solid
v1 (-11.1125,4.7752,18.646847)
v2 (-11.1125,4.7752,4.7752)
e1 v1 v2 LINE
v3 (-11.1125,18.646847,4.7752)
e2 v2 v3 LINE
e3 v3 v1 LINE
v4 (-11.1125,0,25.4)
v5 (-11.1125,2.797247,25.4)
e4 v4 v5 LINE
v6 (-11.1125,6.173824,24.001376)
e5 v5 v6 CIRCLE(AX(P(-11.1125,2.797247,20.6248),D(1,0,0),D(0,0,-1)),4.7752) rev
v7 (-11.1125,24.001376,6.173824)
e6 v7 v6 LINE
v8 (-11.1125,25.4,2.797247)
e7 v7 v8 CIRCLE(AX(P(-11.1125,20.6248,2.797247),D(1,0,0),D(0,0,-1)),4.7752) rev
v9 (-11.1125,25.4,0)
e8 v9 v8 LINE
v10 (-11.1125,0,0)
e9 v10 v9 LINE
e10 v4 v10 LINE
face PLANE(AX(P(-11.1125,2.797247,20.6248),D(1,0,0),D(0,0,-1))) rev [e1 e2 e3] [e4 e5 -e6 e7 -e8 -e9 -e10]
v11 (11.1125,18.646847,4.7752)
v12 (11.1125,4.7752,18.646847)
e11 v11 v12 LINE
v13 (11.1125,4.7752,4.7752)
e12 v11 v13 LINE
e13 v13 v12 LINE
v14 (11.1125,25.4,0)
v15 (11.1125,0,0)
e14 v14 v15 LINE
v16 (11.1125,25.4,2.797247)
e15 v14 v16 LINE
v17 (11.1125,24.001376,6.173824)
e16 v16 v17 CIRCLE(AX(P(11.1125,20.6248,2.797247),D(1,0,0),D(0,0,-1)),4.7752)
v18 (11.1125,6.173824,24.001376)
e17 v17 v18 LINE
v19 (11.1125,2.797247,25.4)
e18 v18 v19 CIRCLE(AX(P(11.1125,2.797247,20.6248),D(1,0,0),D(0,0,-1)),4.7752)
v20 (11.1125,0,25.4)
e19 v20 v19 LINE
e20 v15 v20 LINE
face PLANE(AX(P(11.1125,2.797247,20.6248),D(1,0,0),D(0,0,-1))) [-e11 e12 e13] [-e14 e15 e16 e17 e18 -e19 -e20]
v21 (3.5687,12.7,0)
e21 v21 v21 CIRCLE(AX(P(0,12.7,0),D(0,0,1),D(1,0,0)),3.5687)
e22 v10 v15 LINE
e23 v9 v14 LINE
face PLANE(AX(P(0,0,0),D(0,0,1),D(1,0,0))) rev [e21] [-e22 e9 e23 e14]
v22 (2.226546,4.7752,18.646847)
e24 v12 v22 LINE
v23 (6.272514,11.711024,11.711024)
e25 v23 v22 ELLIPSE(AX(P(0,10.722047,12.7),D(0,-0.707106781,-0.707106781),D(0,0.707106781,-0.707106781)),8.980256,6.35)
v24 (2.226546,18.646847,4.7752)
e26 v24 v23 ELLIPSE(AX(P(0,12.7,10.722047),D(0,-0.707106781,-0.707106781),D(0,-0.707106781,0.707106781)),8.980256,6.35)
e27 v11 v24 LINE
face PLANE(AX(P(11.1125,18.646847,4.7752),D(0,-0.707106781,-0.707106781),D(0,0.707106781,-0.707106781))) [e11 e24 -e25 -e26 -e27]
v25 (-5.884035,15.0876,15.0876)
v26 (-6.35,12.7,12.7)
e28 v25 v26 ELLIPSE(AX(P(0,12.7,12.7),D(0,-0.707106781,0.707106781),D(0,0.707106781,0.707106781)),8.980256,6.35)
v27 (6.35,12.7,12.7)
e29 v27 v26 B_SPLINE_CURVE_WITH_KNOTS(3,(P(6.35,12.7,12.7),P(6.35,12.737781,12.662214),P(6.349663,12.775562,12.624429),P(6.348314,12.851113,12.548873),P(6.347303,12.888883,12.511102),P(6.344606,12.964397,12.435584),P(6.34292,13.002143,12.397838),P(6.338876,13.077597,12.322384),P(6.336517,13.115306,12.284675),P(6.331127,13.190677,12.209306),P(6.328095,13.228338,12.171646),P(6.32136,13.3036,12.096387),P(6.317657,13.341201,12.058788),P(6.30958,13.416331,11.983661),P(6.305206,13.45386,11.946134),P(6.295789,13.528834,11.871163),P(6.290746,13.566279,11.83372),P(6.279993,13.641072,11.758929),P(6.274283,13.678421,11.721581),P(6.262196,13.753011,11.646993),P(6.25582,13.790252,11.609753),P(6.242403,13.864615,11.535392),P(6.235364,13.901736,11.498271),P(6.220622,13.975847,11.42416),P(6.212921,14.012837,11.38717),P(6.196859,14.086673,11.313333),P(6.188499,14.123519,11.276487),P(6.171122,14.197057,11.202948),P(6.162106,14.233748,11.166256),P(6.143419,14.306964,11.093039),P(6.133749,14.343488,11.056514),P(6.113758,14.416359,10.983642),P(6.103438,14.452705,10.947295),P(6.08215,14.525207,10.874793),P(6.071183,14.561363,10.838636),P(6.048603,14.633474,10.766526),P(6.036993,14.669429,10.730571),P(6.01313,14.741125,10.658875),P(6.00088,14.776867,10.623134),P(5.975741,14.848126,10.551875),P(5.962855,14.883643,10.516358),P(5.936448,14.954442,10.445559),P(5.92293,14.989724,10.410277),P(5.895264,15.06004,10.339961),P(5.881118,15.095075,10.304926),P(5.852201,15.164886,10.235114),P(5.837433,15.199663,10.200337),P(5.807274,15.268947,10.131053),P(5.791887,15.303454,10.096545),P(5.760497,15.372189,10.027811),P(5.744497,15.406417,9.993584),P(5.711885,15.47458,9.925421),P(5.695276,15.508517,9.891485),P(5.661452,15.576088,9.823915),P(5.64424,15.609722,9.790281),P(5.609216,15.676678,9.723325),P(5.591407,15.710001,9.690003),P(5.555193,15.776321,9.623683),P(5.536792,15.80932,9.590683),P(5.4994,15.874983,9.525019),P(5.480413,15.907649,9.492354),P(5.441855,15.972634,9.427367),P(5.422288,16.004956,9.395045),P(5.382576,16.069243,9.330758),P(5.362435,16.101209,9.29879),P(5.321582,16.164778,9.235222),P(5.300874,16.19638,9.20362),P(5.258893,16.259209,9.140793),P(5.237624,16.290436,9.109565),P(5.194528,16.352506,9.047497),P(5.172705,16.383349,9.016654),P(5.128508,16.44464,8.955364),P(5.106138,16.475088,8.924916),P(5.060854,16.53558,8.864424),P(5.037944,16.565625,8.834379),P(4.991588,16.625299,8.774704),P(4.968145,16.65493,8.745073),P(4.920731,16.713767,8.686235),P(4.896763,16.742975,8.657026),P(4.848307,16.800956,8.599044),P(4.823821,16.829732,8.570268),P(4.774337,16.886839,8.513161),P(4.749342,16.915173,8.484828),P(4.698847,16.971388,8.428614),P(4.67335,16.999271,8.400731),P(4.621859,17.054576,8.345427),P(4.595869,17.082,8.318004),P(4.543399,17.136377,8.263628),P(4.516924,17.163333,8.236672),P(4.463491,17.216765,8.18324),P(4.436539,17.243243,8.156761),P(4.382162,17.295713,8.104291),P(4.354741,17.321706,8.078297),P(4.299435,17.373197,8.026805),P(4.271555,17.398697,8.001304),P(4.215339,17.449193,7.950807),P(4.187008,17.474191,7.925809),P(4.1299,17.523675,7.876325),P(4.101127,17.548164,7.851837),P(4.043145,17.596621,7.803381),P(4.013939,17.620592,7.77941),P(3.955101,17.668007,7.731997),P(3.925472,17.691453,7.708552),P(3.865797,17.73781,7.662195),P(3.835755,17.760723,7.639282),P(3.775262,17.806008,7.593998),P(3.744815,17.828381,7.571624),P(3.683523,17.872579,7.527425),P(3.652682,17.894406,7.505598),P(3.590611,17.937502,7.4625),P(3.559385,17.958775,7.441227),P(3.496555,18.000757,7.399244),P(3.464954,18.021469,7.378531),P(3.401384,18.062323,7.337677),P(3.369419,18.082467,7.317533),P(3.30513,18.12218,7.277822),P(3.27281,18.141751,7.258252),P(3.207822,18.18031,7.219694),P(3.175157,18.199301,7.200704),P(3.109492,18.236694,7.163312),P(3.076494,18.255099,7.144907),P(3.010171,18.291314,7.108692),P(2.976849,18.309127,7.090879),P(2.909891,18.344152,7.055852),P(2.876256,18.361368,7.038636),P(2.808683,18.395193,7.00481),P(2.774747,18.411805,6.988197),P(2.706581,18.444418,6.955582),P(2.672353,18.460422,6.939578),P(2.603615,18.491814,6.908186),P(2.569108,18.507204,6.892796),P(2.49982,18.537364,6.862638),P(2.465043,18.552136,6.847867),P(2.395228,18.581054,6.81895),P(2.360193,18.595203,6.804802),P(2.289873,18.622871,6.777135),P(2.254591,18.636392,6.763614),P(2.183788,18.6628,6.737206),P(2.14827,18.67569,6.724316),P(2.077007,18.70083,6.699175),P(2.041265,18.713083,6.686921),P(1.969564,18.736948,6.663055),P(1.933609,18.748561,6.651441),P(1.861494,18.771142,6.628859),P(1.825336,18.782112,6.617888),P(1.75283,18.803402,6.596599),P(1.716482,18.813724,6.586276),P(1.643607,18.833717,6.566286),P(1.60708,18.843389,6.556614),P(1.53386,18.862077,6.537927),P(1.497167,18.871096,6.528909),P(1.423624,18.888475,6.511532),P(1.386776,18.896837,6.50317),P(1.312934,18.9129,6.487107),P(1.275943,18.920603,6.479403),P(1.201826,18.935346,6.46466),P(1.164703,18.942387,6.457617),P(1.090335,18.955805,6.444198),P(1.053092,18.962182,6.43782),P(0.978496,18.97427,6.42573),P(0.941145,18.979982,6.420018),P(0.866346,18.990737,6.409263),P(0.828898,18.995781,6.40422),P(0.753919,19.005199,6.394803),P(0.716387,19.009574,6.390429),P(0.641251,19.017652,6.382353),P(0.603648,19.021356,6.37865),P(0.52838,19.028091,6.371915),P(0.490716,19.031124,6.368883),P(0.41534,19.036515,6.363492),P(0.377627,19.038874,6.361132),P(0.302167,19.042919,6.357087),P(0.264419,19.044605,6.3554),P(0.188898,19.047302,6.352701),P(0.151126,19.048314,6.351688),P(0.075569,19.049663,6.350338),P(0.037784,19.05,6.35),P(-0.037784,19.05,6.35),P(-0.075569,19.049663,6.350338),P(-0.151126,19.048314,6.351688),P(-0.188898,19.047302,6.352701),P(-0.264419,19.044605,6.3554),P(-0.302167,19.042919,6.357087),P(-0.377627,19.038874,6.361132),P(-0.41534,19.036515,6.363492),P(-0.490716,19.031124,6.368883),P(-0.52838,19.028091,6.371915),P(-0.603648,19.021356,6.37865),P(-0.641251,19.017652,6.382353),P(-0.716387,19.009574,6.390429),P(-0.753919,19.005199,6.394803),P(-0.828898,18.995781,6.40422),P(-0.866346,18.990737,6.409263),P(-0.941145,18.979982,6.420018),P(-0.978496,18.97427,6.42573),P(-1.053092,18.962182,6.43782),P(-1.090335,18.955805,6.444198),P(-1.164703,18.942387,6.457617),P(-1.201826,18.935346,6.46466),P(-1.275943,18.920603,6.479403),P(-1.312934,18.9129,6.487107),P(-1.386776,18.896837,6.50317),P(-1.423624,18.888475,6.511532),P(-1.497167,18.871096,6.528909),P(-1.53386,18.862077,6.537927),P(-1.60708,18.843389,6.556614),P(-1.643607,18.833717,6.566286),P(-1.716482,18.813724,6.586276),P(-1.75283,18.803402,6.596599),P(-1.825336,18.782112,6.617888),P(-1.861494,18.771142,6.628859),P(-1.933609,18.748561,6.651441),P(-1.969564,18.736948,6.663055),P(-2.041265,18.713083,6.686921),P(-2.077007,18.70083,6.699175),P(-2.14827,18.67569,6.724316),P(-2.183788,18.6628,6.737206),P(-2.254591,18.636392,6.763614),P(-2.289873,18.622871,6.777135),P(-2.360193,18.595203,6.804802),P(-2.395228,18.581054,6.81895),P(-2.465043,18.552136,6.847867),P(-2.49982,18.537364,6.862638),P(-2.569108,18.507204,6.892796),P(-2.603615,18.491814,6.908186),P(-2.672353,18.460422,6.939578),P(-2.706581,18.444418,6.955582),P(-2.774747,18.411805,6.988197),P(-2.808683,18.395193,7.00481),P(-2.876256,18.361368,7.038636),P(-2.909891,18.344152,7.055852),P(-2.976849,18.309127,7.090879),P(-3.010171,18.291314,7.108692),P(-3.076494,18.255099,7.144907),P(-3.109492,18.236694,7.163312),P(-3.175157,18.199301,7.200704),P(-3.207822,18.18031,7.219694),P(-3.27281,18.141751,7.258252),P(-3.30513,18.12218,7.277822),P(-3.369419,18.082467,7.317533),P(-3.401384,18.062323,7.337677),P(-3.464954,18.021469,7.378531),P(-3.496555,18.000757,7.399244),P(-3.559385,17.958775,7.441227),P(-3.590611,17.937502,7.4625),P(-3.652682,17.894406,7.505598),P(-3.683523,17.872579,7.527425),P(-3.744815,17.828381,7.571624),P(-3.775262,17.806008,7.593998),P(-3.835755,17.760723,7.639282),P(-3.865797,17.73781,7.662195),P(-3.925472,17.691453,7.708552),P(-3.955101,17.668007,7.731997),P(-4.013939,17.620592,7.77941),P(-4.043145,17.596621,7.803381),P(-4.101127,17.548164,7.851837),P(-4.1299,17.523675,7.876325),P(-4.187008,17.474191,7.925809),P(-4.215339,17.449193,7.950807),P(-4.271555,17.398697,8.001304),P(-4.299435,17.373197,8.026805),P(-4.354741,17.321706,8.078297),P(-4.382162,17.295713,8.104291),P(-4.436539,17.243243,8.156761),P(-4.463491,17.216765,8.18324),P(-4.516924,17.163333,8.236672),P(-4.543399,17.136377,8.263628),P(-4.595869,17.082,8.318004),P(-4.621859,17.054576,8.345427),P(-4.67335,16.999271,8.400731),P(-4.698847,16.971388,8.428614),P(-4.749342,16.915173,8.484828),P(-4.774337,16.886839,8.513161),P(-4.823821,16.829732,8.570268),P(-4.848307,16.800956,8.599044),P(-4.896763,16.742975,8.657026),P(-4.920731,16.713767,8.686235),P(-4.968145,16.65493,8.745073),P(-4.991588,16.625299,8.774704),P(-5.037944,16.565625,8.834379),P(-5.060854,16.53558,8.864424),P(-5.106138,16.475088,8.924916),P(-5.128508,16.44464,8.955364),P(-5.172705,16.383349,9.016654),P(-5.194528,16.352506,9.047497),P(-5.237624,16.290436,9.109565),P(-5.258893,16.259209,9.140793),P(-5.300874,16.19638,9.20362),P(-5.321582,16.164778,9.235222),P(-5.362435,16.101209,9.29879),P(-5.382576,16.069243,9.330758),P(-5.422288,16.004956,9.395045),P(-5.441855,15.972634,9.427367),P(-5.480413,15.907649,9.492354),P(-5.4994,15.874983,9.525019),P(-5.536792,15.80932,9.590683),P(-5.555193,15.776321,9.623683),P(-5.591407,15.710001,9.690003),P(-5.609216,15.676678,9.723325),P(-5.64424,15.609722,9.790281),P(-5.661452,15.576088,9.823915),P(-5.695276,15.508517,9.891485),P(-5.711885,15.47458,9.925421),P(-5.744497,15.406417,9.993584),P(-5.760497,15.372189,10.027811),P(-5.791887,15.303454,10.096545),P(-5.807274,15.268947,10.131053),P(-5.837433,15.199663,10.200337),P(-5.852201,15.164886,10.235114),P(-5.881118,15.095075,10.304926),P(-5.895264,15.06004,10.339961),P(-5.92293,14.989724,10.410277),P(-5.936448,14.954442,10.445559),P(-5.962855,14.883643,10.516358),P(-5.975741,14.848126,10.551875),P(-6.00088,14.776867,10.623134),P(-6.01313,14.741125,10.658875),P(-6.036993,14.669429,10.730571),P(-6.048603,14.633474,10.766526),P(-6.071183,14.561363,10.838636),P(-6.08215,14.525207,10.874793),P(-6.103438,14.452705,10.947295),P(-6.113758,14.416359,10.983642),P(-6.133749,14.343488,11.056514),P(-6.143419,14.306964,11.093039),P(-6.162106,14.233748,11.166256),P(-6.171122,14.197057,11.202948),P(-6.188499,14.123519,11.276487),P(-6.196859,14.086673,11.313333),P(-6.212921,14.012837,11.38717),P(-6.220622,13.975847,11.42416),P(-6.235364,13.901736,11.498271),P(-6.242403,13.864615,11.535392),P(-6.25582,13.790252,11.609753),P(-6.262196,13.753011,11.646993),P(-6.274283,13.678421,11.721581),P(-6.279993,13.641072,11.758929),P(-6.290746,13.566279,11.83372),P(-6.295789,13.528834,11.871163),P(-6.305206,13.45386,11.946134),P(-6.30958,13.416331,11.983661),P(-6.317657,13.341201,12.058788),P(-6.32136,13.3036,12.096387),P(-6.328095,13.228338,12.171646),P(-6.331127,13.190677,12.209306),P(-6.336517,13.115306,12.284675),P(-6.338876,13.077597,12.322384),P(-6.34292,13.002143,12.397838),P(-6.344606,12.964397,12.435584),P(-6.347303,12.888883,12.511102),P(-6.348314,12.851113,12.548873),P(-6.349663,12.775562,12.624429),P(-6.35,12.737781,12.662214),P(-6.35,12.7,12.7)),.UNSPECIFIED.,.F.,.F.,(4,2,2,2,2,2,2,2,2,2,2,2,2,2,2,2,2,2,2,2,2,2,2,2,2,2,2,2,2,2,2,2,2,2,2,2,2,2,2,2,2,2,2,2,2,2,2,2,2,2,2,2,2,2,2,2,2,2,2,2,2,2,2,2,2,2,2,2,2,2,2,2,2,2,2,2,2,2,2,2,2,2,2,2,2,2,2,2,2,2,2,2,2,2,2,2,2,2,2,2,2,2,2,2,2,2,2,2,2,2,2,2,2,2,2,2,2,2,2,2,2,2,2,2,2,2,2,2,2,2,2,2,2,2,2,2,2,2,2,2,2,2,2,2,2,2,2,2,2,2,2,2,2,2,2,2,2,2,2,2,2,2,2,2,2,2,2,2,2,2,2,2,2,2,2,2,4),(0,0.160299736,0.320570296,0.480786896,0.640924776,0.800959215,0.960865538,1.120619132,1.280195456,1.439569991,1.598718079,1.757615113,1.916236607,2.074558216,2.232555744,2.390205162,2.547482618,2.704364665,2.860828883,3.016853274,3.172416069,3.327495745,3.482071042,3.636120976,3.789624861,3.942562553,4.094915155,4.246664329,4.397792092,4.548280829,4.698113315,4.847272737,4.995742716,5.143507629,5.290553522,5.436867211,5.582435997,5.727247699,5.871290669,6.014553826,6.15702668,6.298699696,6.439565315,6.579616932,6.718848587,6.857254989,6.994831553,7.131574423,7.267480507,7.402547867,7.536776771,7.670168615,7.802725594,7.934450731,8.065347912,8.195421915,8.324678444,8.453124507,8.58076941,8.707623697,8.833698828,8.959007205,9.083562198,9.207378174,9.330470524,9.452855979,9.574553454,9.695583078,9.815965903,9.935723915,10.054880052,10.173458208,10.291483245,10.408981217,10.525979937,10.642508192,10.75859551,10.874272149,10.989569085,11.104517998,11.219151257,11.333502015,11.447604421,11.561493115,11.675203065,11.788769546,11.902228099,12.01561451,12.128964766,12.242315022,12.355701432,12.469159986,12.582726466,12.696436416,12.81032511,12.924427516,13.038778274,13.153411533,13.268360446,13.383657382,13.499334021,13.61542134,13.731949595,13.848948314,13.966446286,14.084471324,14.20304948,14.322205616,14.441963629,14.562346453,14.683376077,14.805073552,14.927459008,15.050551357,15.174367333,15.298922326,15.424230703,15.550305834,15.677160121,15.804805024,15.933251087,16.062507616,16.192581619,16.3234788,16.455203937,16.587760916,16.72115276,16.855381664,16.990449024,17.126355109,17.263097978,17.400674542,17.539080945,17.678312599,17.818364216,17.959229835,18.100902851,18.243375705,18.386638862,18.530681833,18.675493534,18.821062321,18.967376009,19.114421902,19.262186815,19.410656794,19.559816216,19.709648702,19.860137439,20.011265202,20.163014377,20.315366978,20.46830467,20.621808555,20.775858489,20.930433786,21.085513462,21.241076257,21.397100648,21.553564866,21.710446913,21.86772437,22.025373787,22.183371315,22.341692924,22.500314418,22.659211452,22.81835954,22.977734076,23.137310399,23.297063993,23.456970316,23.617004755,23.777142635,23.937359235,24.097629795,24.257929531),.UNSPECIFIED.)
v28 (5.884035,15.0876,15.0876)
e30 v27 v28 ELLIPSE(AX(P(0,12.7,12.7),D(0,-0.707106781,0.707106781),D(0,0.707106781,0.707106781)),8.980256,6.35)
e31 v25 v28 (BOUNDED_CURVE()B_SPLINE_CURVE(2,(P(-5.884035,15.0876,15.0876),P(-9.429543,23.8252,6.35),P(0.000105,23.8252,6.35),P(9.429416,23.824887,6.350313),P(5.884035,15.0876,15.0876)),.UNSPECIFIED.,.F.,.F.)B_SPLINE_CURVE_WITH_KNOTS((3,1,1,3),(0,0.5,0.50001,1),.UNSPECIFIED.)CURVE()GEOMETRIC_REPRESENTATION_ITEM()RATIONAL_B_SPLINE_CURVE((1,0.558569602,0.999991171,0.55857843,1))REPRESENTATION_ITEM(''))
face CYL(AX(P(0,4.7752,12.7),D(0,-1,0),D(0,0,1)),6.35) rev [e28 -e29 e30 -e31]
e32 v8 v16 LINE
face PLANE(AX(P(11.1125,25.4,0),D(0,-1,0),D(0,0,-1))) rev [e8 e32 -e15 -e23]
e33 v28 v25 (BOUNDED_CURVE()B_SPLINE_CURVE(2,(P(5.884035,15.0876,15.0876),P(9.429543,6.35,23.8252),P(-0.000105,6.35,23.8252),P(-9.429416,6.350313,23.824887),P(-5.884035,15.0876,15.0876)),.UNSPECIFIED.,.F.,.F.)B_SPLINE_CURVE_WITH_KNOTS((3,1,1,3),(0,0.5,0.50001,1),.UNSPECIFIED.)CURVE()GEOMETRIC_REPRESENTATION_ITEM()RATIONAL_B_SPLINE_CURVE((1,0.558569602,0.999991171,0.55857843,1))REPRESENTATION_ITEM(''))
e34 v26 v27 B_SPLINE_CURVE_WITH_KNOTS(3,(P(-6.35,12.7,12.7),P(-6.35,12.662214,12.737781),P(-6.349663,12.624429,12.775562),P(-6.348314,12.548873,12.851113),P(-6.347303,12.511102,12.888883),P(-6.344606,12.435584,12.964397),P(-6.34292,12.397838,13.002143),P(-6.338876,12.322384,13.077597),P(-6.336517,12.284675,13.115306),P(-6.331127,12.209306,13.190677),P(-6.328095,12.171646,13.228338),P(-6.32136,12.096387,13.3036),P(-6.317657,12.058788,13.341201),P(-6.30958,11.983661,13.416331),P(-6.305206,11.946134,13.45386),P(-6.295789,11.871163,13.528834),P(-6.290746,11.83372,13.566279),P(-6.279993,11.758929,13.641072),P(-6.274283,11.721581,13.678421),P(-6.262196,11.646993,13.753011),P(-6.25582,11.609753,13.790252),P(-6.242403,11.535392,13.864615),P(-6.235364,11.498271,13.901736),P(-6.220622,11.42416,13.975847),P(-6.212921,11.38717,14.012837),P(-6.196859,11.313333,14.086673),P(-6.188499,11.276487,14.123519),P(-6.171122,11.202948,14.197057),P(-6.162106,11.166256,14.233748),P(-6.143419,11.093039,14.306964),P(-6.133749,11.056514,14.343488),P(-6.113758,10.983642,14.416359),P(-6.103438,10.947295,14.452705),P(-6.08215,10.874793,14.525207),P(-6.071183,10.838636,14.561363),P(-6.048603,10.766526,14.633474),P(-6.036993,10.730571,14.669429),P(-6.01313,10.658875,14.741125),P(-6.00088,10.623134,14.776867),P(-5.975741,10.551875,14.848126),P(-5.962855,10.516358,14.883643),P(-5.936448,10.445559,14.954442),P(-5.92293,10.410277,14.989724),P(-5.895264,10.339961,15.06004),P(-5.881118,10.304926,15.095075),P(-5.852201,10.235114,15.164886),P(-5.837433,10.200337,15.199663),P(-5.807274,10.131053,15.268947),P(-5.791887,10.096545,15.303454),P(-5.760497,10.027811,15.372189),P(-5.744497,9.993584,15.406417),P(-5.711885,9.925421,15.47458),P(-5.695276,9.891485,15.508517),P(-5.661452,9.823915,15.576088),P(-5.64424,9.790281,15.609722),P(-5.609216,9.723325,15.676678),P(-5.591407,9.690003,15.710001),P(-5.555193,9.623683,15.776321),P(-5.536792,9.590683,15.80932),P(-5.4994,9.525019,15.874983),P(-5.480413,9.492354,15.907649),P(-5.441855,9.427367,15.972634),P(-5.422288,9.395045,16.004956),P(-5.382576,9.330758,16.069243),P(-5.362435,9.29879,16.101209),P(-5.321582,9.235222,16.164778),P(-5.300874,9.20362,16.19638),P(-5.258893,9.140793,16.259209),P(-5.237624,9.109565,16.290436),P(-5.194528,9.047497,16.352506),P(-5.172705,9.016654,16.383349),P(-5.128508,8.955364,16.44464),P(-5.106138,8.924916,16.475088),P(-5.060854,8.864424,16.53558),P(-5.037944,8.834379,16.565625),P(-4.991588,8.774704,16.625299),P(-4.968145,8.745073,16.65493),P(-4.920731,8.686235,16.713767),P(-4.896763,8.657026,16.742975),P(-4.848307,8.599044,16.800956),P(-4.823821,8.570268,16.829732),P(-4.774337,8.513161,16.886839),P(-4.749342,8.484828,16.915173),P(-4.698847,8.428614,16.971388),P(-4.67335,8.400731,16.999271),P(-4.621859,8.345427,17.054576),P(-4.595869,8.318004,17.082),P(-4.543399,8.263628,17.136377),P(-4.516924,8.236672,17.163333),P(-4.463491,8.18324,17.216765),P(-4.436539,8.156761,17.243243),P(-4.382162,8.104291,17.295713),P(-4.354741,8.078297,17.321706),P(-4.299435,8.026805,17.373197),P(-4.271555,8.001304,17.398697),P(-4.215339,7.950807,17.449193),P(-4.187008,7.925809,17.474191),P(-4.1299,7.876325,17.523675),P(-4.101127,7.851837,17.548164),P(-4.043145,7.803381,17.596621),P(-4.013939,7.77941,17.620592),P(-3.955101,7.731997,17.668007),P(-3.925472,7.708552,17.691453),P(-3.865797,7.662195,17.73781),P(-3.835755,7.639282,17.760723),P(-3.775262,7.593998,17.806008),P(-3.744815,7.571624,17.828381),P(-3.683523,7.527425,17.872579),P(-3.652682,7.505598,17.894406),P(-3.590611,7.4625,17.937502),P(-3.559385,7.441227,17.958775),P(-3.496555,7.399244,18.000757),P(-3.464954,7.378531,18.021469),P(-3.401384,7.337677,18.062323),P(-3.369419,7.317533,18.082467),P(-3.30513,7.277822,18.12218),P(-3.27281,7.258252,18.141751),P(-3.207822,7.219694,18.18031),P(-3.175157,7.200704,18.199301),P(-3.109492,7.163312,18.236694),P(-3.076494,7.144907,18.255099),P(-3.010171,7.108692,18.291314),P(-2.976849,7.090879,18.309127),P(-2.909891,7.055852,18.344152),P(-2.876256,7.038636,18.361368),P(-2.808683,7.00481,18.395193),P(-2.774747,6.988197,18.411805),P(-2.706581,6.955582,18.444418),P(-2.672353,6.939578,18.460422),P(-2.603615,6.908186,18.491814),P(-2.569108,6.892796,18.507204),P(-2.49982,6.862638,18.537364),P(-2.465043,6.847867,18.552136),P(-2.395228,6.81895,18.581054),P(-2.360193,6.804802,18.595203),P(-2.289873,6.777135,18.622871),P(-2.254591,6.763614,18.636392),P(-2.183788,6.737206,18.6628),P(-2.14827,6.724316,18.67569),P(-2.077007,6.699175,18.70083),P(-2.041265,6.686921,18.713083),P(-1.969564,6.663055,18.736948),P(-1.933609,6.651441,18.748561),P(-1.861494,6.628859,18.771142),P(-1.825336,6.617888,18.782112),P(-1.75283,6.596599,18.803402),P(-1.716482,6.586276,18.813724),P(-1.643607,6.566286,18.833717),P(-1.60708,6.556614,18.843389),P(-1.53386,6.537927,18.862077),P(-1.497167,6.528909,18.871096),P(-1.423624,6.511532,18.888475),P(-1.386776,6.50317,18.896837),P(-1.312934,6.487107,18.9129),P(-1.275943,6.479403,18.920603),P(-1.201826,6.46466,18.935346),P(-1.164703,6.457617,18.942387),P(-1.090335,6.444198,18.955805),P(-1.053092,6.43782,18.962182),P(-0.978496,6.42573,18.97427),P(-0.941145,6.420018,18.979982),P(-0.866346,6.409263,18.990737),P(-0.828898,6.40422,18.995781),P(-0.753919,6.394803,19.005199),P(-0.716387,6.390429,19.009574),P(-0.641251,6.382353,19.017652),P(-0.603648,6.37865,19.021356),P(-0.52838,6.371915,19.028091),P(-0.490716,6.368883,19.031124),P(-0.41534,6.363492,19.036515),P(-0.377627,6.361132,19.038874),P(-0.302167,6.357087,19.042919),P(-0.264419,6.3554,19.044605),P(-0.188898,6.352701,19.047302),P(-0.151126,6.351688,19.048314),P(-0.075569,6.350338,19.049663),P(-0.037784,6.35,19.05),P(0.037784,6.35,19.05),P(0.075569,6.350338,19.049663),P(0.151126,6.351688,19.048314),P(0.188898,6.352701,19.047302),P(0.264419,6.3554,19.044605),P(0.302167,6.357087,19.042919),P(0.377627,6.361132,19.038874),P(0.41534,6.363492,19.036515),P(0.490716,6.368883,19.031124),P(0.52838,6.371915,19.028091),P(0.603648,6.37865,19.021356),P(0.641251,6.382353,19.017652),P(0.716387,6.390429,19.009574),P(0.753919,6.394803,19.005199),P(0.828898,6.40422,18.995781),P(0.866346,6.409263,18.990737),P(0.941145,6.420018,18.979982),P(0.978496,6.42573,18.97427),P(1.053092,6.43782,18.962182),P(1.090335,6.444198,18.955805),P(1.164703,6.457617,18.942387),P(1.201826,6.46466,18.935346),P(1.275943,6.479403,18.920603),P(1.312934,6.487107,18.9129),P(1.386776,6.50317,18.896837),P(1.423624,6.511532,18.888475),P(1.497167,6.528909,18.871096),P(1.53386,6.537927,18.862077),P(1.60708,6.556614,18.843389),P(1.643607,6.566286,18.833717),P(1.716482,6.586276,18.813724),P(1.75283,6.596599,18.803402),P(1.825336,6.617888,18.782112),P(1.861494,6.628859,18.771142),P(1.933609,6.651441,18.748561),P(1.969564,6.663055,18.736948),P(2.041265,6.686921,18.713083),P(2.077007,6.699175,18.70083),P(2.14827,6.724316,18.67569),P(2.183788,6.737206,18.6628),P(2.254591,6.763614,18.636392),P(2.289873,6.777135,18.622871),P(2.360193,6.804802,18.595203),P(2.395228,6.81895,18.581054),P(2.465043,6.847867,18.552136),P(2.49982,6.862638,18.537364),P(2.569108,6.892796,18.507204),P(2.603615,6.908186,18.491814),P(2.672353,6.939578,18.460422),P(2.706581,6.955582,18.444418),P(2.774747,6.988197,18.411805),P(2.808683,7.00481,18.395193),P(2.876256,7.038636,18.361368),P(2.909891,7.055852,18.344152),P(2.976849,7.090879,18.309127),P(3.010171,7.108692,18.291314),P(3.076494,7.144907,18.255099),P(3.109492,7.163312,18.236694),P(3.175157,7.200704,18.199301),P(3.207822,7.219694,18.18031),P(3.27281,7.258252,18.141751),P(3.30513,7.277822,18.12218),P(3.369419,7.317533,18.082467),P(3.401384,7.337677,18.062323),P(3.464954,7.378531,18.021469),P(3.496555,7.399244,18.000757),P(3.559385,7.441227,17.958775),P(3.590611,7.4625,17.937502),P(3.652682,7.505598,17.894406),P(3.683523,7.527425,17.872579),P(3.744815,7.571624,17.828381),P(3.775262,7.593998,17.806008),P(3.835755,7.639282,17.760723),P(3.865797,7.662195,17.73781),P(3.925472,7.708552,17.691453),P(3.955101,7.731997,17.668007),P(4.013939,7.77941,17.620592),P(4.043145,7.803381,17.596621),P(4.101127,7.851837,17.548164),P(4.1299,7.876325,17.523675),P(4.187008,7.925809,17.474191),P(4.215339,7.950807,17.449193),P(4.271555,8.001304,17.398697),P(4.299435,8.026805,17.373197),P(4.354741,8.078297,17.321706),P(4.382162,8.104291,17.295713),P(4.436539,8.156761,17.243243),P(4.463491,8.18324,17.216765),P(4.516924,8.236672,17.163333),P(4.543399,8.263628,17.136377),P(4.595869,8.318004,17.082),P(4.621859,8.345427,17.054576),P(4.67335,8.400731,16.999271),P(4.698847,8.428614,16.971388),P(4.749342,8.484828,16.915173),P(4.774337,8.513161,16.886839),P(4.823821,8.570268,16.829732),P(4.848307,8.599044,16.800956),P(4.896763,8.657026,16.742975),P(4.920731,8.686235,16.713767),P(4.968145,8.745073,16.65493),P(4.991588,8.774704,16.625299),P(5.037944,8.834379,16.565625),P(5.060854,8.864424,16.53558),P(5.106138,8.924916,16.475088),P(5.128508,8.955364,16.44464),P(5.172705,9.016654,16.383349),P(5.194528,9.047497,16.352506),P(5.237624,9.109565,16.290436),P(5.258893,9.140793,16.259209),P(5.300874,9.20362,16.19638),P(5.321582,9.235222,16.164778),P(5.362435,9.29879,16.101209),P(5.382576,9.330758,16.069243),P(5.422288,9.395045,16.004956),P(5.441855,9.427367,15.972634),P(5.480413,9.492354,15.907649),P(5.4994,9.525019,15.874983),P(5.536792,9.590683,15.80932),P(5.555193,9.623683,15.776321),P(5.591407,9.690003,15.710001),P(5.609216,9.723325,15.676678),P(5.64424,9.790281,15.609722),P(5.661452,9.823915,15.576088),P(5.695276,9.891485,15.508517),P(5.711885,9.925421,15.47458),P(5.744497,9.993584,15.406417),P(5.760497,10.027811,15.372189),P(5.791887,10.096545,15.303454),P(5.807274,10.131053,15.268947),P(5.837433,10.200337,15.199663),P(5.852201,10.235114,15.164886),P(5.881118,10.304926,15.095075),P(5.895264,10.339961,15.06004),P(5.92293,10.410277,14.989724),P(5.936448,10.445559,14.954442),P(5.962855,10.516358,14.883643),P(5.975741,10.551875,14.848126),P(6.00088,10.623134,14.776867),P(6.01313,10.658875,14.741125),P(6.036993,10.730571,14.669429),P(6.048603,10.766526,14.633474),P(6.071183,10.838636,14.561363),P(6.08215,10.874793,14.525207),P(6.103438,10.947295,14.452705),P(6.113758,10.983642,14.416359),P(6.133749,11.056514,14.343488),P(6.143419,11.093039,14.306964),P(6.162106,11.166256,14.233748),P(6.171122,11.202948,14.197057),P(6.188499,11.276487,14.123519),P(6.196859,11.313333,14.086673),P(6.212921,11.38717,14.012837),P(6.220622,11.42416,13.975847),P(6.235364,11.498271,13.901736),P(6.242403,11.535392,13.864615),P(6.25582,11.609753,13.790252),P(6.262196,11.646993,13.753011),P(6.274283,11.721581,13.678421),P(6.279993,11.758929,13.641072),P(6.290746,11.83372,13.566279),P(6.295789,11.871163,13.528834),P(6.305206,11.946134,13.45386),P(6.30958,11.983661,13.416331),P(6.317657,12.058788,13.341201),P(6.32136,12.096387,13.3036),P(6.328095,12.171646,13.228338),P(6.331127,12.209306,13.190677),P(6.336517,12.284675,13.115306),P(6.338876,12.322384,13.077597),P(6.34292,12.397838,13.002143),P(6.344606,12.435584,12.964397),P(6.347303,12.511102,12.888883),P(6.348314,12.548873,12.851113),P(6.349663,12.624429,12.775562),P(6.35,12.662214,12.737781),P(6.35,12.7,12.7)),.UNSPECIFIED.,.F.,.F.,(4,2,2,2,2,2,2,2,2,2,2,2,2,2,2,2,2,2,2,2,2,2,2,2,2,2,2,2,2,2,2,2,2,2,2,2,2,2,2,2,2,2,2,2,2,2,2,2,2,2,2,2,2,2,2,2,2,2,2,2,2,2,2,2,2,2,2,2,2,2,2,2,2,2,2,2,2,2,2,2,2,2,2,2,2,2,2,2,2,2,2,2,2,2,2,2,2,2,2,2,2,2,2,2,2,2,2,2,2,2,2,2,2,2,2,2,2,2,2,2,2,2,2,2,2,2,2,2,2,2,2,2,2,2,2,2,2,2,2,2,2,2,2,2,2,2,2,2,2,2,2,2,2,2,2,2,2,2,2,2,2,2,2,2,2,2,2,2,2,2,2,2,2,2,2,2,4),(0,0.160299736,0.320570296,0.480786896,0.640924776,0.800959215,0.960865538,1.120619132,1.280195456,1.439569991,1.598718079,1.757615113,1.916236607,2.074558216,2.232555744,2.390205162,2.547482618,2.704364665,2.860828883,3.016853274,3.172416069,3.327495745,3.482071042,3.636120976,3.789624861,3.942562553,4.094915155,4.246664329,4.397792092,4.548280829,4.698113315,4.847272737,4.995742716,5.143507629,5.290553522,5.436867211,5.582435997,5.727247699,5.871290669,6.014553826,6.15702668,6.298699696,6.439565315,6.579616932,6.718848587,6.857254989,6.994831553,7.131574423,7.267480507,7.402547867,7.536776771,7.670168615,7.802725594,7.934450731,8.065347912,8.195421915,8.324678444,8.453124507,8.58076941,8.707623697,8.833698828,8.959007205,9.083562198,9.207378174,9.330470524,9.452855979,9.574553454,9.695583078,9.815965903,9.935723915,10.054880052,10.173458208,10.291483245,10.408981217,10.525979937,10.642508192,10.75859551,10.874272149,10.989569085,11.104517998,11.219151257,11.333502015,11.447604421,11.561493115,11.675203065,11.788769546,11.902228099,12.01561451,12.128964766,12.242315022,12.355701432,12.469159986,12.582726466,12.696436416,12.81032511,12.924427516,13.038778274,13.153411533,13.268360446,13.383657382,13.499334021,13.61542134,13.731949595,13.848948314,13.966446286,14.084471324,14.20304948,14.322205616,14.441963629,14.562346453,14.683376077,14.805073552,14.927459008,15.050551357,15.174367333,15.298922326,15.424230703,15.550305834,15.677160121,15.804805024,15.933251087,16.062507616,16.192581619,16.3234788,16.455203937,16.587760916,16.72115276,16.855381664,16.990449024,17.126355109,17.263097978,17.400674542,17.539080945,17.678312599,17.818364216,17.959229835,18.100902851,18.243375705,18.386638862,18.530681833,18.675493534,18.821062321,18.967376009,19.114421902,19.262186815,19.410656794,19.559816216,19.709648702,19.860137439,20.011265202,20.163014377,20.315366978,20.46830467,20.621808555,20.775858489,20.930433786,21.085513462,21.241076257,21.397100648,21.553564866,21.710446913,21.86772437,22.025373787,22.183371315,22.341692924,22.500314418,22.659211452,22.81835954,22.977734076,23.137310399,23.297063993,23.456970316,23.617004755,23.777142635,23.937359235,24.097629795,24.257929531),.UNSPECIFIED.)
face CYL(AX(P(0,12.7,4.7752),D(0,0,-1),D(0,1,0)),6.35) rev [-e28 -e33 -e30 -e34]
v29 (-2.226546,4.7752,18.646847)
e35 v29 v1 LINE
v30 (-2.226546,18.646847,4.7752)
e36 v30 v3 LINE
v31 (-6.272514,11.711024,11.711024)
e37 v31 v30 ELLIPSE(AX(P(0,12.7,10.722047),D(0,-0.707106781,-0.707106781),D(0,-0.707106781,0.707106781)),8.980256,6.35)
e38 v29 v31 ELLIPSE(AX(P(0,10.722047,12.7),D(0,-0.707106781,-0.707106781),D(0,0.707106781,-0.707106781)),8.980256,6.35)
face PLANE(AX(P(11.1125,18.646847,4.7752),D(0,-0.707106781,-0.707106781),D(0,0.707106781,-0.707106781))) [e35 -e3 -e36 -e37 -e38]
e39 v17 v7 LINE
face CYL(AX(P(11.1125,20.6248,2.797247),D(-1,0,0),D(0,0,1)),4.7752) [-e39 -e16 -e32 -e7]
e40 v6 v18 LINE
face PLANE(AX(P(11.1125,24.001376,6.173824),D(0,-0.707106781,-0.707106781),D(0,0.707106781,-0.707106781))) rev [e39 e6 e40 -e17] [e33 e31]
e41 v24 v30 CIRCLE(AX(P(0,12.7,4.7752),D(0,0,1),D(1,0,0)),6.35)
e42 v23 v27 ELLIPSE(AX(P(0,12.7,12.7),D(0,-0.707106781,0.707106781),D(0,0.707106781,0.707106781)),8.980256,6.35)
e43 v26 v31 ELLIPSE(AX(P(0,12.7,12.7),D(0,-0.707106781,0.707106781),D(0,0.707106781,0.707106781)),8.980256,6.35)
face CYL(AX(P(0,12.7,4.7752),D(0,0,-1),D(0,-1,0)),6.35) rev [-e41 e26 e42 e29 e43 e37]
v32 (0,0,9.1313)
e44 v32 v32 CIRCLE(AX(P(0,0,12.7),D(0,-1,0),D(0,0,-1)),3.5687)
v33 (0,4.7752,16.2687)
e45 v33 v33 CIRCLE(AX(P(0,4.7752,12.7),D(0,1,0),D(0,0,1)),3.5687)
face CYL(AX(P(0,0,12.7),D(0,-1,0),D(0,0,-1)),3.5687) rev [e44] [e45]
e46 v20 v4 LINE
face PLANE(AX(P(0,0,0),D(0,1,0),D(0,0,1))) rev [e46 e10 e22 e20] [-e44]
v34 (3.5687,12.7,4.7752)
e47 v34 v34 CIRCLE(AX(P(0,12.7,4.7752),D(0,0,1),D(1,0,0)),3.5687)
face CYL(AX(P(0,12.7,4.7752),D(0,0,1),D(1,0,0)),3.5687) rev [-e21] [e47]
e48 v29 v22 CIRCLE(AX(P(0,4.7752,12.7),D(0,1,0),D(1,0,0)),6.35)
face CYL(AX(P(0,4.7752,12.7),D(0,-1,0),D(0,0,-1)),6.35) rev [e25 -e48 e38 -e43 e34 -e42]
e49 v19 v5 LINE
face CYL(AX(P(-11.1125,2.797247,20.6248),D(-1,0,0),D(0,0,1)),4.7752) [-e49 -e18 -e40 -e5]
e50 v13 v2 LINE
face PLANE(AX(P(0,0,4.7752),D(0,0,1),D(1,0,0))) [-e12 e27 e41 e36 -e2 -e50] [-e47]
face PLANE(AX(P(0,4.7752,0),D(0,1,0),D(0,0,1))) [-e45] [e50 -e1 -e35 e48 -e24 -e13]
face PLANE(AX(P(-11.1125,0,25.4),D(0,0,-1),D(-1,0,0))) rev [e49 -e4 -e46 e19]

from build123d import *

# Parameters (mm, degrees)
BOSS_EXTRUDE1_START      = -11.1125
BOSS_EXTRUDE1_DEPTH      = 22.225
BOSS_EXTRUDE1_START_2    = 4.7752
BOSS_EXTRUDE1_2_DEPTH    = 20.6248
BOSS_EXTRUDE1_START_3    = 4
BOSS_EXTRUDE1_3_DEPTH    = 21.4
SKETCH2_W                = 22.225
SKETCH2_H                = 25.4
BOSS_EXTRUDE2_DEPTH      = 4.7752
K_0_281_DIAMETER_HOLE1_D = 7.1374
K_0_281_DIAMETER_HOLE2_D = 7.1374
FILLET1_R                = 4.7752


with BuildPart() as part:
    # Boss-Extrude1: read off the stored shape, not the designer's step
    # Boss-Extrude1 outline → Boss-Extrude1 (new body)
    with BuildSketch(Plane.YZ.offset(BOSS_EXTRUDE1_START)):
        Polygon((25.4, 4.7752), (4.7752, 25.4), (4.7752, 18.646847397), (18.646847397, 4.7752), (4.7752, 4.7752), (4.7752, 0), (25.4, 0), align=None)
    extrude(amount=BOSS_EXTRUDE1_DEPTH)

    # Boss-Extrude1 2 outline → Boss-Extrude1 2 (cut)
    with BuildSketch(Plane.XY.offset(BOSS_EXTRUDE1_START_2)):
        with BuildLine():
            ThreePointArc((6.272513521, 11.711023698), (0, 19.05), (-6.272513521, 11.711023698))
            ThreePointArc((-6.272513521, 11.711023698), (0, 6.35), (6.272513521, 11.711023698))
        make_face()
    extrude(amount=BOSS_EXTRUDE1_2_DEPTH, mode=Mode.SUBTRACT)

    # Boss-Extrude1 3 outline → Boss-Extrude1 3 (cut)
    with BuildSketch(Plane(origin=(0, 0, 0), x_dir=(1, 0, 0), z_dir=(0, 1, 0)).offset(BOSS_EXTRUDE1_START_3)):
        with BuildLine():
            ThreePointArc((-6.272513521, -11.711023698), (0, -19.05), (6.272513521, -11.711023698))
            ThreePointArc((6.272513521, -11.711023698), (0, -6.35), (-6.272513521, -11.711023698))
        make_face()
    extrude(amount=BOSS_EXTRUDE1_3_DEPTH, mode=Mode.SUBTRACT)

    # Sketch2 → Boss-Extrude2 (add)
    with BuildSketch(Plane.XZ.offset(-4.7752)):
        with Locations((0, 12.7)):
            Rectangle(SKETCH2_W, SKETCH2_H)
    extrude(amount=BOSS_EXTRUDE2_DEPTH)

    # K (0.281) Diameter Hole1 (through all)
    with Locations(Plane(origin=(0, 0, 0), x_dir=(-1, 0, 0), z_dir=(0, -1, 0))):
        with Locations((0, -12.7)):
            Hole(K_0_281_DIAMETER_HOLE1_D / 2)

    # K (0.281) Diameter Hole2 (through all)
    with Locations(Plane.XY.offset(4.7752)):
        with Locations((0, 12.7)):
            Hole(K_0_281_DIAMETER_HOLE2_D / 2)

    # Fillet1
    fillet1_edges = [part.edges().sort_by_distance(p)[0] for p in [
        (0, 25.4, 4.7752),
        (0, 4.7752, 25.4),
    ]]
    fillet(fillet1_edges, radius=FILLET1_R)


solid = part.part
